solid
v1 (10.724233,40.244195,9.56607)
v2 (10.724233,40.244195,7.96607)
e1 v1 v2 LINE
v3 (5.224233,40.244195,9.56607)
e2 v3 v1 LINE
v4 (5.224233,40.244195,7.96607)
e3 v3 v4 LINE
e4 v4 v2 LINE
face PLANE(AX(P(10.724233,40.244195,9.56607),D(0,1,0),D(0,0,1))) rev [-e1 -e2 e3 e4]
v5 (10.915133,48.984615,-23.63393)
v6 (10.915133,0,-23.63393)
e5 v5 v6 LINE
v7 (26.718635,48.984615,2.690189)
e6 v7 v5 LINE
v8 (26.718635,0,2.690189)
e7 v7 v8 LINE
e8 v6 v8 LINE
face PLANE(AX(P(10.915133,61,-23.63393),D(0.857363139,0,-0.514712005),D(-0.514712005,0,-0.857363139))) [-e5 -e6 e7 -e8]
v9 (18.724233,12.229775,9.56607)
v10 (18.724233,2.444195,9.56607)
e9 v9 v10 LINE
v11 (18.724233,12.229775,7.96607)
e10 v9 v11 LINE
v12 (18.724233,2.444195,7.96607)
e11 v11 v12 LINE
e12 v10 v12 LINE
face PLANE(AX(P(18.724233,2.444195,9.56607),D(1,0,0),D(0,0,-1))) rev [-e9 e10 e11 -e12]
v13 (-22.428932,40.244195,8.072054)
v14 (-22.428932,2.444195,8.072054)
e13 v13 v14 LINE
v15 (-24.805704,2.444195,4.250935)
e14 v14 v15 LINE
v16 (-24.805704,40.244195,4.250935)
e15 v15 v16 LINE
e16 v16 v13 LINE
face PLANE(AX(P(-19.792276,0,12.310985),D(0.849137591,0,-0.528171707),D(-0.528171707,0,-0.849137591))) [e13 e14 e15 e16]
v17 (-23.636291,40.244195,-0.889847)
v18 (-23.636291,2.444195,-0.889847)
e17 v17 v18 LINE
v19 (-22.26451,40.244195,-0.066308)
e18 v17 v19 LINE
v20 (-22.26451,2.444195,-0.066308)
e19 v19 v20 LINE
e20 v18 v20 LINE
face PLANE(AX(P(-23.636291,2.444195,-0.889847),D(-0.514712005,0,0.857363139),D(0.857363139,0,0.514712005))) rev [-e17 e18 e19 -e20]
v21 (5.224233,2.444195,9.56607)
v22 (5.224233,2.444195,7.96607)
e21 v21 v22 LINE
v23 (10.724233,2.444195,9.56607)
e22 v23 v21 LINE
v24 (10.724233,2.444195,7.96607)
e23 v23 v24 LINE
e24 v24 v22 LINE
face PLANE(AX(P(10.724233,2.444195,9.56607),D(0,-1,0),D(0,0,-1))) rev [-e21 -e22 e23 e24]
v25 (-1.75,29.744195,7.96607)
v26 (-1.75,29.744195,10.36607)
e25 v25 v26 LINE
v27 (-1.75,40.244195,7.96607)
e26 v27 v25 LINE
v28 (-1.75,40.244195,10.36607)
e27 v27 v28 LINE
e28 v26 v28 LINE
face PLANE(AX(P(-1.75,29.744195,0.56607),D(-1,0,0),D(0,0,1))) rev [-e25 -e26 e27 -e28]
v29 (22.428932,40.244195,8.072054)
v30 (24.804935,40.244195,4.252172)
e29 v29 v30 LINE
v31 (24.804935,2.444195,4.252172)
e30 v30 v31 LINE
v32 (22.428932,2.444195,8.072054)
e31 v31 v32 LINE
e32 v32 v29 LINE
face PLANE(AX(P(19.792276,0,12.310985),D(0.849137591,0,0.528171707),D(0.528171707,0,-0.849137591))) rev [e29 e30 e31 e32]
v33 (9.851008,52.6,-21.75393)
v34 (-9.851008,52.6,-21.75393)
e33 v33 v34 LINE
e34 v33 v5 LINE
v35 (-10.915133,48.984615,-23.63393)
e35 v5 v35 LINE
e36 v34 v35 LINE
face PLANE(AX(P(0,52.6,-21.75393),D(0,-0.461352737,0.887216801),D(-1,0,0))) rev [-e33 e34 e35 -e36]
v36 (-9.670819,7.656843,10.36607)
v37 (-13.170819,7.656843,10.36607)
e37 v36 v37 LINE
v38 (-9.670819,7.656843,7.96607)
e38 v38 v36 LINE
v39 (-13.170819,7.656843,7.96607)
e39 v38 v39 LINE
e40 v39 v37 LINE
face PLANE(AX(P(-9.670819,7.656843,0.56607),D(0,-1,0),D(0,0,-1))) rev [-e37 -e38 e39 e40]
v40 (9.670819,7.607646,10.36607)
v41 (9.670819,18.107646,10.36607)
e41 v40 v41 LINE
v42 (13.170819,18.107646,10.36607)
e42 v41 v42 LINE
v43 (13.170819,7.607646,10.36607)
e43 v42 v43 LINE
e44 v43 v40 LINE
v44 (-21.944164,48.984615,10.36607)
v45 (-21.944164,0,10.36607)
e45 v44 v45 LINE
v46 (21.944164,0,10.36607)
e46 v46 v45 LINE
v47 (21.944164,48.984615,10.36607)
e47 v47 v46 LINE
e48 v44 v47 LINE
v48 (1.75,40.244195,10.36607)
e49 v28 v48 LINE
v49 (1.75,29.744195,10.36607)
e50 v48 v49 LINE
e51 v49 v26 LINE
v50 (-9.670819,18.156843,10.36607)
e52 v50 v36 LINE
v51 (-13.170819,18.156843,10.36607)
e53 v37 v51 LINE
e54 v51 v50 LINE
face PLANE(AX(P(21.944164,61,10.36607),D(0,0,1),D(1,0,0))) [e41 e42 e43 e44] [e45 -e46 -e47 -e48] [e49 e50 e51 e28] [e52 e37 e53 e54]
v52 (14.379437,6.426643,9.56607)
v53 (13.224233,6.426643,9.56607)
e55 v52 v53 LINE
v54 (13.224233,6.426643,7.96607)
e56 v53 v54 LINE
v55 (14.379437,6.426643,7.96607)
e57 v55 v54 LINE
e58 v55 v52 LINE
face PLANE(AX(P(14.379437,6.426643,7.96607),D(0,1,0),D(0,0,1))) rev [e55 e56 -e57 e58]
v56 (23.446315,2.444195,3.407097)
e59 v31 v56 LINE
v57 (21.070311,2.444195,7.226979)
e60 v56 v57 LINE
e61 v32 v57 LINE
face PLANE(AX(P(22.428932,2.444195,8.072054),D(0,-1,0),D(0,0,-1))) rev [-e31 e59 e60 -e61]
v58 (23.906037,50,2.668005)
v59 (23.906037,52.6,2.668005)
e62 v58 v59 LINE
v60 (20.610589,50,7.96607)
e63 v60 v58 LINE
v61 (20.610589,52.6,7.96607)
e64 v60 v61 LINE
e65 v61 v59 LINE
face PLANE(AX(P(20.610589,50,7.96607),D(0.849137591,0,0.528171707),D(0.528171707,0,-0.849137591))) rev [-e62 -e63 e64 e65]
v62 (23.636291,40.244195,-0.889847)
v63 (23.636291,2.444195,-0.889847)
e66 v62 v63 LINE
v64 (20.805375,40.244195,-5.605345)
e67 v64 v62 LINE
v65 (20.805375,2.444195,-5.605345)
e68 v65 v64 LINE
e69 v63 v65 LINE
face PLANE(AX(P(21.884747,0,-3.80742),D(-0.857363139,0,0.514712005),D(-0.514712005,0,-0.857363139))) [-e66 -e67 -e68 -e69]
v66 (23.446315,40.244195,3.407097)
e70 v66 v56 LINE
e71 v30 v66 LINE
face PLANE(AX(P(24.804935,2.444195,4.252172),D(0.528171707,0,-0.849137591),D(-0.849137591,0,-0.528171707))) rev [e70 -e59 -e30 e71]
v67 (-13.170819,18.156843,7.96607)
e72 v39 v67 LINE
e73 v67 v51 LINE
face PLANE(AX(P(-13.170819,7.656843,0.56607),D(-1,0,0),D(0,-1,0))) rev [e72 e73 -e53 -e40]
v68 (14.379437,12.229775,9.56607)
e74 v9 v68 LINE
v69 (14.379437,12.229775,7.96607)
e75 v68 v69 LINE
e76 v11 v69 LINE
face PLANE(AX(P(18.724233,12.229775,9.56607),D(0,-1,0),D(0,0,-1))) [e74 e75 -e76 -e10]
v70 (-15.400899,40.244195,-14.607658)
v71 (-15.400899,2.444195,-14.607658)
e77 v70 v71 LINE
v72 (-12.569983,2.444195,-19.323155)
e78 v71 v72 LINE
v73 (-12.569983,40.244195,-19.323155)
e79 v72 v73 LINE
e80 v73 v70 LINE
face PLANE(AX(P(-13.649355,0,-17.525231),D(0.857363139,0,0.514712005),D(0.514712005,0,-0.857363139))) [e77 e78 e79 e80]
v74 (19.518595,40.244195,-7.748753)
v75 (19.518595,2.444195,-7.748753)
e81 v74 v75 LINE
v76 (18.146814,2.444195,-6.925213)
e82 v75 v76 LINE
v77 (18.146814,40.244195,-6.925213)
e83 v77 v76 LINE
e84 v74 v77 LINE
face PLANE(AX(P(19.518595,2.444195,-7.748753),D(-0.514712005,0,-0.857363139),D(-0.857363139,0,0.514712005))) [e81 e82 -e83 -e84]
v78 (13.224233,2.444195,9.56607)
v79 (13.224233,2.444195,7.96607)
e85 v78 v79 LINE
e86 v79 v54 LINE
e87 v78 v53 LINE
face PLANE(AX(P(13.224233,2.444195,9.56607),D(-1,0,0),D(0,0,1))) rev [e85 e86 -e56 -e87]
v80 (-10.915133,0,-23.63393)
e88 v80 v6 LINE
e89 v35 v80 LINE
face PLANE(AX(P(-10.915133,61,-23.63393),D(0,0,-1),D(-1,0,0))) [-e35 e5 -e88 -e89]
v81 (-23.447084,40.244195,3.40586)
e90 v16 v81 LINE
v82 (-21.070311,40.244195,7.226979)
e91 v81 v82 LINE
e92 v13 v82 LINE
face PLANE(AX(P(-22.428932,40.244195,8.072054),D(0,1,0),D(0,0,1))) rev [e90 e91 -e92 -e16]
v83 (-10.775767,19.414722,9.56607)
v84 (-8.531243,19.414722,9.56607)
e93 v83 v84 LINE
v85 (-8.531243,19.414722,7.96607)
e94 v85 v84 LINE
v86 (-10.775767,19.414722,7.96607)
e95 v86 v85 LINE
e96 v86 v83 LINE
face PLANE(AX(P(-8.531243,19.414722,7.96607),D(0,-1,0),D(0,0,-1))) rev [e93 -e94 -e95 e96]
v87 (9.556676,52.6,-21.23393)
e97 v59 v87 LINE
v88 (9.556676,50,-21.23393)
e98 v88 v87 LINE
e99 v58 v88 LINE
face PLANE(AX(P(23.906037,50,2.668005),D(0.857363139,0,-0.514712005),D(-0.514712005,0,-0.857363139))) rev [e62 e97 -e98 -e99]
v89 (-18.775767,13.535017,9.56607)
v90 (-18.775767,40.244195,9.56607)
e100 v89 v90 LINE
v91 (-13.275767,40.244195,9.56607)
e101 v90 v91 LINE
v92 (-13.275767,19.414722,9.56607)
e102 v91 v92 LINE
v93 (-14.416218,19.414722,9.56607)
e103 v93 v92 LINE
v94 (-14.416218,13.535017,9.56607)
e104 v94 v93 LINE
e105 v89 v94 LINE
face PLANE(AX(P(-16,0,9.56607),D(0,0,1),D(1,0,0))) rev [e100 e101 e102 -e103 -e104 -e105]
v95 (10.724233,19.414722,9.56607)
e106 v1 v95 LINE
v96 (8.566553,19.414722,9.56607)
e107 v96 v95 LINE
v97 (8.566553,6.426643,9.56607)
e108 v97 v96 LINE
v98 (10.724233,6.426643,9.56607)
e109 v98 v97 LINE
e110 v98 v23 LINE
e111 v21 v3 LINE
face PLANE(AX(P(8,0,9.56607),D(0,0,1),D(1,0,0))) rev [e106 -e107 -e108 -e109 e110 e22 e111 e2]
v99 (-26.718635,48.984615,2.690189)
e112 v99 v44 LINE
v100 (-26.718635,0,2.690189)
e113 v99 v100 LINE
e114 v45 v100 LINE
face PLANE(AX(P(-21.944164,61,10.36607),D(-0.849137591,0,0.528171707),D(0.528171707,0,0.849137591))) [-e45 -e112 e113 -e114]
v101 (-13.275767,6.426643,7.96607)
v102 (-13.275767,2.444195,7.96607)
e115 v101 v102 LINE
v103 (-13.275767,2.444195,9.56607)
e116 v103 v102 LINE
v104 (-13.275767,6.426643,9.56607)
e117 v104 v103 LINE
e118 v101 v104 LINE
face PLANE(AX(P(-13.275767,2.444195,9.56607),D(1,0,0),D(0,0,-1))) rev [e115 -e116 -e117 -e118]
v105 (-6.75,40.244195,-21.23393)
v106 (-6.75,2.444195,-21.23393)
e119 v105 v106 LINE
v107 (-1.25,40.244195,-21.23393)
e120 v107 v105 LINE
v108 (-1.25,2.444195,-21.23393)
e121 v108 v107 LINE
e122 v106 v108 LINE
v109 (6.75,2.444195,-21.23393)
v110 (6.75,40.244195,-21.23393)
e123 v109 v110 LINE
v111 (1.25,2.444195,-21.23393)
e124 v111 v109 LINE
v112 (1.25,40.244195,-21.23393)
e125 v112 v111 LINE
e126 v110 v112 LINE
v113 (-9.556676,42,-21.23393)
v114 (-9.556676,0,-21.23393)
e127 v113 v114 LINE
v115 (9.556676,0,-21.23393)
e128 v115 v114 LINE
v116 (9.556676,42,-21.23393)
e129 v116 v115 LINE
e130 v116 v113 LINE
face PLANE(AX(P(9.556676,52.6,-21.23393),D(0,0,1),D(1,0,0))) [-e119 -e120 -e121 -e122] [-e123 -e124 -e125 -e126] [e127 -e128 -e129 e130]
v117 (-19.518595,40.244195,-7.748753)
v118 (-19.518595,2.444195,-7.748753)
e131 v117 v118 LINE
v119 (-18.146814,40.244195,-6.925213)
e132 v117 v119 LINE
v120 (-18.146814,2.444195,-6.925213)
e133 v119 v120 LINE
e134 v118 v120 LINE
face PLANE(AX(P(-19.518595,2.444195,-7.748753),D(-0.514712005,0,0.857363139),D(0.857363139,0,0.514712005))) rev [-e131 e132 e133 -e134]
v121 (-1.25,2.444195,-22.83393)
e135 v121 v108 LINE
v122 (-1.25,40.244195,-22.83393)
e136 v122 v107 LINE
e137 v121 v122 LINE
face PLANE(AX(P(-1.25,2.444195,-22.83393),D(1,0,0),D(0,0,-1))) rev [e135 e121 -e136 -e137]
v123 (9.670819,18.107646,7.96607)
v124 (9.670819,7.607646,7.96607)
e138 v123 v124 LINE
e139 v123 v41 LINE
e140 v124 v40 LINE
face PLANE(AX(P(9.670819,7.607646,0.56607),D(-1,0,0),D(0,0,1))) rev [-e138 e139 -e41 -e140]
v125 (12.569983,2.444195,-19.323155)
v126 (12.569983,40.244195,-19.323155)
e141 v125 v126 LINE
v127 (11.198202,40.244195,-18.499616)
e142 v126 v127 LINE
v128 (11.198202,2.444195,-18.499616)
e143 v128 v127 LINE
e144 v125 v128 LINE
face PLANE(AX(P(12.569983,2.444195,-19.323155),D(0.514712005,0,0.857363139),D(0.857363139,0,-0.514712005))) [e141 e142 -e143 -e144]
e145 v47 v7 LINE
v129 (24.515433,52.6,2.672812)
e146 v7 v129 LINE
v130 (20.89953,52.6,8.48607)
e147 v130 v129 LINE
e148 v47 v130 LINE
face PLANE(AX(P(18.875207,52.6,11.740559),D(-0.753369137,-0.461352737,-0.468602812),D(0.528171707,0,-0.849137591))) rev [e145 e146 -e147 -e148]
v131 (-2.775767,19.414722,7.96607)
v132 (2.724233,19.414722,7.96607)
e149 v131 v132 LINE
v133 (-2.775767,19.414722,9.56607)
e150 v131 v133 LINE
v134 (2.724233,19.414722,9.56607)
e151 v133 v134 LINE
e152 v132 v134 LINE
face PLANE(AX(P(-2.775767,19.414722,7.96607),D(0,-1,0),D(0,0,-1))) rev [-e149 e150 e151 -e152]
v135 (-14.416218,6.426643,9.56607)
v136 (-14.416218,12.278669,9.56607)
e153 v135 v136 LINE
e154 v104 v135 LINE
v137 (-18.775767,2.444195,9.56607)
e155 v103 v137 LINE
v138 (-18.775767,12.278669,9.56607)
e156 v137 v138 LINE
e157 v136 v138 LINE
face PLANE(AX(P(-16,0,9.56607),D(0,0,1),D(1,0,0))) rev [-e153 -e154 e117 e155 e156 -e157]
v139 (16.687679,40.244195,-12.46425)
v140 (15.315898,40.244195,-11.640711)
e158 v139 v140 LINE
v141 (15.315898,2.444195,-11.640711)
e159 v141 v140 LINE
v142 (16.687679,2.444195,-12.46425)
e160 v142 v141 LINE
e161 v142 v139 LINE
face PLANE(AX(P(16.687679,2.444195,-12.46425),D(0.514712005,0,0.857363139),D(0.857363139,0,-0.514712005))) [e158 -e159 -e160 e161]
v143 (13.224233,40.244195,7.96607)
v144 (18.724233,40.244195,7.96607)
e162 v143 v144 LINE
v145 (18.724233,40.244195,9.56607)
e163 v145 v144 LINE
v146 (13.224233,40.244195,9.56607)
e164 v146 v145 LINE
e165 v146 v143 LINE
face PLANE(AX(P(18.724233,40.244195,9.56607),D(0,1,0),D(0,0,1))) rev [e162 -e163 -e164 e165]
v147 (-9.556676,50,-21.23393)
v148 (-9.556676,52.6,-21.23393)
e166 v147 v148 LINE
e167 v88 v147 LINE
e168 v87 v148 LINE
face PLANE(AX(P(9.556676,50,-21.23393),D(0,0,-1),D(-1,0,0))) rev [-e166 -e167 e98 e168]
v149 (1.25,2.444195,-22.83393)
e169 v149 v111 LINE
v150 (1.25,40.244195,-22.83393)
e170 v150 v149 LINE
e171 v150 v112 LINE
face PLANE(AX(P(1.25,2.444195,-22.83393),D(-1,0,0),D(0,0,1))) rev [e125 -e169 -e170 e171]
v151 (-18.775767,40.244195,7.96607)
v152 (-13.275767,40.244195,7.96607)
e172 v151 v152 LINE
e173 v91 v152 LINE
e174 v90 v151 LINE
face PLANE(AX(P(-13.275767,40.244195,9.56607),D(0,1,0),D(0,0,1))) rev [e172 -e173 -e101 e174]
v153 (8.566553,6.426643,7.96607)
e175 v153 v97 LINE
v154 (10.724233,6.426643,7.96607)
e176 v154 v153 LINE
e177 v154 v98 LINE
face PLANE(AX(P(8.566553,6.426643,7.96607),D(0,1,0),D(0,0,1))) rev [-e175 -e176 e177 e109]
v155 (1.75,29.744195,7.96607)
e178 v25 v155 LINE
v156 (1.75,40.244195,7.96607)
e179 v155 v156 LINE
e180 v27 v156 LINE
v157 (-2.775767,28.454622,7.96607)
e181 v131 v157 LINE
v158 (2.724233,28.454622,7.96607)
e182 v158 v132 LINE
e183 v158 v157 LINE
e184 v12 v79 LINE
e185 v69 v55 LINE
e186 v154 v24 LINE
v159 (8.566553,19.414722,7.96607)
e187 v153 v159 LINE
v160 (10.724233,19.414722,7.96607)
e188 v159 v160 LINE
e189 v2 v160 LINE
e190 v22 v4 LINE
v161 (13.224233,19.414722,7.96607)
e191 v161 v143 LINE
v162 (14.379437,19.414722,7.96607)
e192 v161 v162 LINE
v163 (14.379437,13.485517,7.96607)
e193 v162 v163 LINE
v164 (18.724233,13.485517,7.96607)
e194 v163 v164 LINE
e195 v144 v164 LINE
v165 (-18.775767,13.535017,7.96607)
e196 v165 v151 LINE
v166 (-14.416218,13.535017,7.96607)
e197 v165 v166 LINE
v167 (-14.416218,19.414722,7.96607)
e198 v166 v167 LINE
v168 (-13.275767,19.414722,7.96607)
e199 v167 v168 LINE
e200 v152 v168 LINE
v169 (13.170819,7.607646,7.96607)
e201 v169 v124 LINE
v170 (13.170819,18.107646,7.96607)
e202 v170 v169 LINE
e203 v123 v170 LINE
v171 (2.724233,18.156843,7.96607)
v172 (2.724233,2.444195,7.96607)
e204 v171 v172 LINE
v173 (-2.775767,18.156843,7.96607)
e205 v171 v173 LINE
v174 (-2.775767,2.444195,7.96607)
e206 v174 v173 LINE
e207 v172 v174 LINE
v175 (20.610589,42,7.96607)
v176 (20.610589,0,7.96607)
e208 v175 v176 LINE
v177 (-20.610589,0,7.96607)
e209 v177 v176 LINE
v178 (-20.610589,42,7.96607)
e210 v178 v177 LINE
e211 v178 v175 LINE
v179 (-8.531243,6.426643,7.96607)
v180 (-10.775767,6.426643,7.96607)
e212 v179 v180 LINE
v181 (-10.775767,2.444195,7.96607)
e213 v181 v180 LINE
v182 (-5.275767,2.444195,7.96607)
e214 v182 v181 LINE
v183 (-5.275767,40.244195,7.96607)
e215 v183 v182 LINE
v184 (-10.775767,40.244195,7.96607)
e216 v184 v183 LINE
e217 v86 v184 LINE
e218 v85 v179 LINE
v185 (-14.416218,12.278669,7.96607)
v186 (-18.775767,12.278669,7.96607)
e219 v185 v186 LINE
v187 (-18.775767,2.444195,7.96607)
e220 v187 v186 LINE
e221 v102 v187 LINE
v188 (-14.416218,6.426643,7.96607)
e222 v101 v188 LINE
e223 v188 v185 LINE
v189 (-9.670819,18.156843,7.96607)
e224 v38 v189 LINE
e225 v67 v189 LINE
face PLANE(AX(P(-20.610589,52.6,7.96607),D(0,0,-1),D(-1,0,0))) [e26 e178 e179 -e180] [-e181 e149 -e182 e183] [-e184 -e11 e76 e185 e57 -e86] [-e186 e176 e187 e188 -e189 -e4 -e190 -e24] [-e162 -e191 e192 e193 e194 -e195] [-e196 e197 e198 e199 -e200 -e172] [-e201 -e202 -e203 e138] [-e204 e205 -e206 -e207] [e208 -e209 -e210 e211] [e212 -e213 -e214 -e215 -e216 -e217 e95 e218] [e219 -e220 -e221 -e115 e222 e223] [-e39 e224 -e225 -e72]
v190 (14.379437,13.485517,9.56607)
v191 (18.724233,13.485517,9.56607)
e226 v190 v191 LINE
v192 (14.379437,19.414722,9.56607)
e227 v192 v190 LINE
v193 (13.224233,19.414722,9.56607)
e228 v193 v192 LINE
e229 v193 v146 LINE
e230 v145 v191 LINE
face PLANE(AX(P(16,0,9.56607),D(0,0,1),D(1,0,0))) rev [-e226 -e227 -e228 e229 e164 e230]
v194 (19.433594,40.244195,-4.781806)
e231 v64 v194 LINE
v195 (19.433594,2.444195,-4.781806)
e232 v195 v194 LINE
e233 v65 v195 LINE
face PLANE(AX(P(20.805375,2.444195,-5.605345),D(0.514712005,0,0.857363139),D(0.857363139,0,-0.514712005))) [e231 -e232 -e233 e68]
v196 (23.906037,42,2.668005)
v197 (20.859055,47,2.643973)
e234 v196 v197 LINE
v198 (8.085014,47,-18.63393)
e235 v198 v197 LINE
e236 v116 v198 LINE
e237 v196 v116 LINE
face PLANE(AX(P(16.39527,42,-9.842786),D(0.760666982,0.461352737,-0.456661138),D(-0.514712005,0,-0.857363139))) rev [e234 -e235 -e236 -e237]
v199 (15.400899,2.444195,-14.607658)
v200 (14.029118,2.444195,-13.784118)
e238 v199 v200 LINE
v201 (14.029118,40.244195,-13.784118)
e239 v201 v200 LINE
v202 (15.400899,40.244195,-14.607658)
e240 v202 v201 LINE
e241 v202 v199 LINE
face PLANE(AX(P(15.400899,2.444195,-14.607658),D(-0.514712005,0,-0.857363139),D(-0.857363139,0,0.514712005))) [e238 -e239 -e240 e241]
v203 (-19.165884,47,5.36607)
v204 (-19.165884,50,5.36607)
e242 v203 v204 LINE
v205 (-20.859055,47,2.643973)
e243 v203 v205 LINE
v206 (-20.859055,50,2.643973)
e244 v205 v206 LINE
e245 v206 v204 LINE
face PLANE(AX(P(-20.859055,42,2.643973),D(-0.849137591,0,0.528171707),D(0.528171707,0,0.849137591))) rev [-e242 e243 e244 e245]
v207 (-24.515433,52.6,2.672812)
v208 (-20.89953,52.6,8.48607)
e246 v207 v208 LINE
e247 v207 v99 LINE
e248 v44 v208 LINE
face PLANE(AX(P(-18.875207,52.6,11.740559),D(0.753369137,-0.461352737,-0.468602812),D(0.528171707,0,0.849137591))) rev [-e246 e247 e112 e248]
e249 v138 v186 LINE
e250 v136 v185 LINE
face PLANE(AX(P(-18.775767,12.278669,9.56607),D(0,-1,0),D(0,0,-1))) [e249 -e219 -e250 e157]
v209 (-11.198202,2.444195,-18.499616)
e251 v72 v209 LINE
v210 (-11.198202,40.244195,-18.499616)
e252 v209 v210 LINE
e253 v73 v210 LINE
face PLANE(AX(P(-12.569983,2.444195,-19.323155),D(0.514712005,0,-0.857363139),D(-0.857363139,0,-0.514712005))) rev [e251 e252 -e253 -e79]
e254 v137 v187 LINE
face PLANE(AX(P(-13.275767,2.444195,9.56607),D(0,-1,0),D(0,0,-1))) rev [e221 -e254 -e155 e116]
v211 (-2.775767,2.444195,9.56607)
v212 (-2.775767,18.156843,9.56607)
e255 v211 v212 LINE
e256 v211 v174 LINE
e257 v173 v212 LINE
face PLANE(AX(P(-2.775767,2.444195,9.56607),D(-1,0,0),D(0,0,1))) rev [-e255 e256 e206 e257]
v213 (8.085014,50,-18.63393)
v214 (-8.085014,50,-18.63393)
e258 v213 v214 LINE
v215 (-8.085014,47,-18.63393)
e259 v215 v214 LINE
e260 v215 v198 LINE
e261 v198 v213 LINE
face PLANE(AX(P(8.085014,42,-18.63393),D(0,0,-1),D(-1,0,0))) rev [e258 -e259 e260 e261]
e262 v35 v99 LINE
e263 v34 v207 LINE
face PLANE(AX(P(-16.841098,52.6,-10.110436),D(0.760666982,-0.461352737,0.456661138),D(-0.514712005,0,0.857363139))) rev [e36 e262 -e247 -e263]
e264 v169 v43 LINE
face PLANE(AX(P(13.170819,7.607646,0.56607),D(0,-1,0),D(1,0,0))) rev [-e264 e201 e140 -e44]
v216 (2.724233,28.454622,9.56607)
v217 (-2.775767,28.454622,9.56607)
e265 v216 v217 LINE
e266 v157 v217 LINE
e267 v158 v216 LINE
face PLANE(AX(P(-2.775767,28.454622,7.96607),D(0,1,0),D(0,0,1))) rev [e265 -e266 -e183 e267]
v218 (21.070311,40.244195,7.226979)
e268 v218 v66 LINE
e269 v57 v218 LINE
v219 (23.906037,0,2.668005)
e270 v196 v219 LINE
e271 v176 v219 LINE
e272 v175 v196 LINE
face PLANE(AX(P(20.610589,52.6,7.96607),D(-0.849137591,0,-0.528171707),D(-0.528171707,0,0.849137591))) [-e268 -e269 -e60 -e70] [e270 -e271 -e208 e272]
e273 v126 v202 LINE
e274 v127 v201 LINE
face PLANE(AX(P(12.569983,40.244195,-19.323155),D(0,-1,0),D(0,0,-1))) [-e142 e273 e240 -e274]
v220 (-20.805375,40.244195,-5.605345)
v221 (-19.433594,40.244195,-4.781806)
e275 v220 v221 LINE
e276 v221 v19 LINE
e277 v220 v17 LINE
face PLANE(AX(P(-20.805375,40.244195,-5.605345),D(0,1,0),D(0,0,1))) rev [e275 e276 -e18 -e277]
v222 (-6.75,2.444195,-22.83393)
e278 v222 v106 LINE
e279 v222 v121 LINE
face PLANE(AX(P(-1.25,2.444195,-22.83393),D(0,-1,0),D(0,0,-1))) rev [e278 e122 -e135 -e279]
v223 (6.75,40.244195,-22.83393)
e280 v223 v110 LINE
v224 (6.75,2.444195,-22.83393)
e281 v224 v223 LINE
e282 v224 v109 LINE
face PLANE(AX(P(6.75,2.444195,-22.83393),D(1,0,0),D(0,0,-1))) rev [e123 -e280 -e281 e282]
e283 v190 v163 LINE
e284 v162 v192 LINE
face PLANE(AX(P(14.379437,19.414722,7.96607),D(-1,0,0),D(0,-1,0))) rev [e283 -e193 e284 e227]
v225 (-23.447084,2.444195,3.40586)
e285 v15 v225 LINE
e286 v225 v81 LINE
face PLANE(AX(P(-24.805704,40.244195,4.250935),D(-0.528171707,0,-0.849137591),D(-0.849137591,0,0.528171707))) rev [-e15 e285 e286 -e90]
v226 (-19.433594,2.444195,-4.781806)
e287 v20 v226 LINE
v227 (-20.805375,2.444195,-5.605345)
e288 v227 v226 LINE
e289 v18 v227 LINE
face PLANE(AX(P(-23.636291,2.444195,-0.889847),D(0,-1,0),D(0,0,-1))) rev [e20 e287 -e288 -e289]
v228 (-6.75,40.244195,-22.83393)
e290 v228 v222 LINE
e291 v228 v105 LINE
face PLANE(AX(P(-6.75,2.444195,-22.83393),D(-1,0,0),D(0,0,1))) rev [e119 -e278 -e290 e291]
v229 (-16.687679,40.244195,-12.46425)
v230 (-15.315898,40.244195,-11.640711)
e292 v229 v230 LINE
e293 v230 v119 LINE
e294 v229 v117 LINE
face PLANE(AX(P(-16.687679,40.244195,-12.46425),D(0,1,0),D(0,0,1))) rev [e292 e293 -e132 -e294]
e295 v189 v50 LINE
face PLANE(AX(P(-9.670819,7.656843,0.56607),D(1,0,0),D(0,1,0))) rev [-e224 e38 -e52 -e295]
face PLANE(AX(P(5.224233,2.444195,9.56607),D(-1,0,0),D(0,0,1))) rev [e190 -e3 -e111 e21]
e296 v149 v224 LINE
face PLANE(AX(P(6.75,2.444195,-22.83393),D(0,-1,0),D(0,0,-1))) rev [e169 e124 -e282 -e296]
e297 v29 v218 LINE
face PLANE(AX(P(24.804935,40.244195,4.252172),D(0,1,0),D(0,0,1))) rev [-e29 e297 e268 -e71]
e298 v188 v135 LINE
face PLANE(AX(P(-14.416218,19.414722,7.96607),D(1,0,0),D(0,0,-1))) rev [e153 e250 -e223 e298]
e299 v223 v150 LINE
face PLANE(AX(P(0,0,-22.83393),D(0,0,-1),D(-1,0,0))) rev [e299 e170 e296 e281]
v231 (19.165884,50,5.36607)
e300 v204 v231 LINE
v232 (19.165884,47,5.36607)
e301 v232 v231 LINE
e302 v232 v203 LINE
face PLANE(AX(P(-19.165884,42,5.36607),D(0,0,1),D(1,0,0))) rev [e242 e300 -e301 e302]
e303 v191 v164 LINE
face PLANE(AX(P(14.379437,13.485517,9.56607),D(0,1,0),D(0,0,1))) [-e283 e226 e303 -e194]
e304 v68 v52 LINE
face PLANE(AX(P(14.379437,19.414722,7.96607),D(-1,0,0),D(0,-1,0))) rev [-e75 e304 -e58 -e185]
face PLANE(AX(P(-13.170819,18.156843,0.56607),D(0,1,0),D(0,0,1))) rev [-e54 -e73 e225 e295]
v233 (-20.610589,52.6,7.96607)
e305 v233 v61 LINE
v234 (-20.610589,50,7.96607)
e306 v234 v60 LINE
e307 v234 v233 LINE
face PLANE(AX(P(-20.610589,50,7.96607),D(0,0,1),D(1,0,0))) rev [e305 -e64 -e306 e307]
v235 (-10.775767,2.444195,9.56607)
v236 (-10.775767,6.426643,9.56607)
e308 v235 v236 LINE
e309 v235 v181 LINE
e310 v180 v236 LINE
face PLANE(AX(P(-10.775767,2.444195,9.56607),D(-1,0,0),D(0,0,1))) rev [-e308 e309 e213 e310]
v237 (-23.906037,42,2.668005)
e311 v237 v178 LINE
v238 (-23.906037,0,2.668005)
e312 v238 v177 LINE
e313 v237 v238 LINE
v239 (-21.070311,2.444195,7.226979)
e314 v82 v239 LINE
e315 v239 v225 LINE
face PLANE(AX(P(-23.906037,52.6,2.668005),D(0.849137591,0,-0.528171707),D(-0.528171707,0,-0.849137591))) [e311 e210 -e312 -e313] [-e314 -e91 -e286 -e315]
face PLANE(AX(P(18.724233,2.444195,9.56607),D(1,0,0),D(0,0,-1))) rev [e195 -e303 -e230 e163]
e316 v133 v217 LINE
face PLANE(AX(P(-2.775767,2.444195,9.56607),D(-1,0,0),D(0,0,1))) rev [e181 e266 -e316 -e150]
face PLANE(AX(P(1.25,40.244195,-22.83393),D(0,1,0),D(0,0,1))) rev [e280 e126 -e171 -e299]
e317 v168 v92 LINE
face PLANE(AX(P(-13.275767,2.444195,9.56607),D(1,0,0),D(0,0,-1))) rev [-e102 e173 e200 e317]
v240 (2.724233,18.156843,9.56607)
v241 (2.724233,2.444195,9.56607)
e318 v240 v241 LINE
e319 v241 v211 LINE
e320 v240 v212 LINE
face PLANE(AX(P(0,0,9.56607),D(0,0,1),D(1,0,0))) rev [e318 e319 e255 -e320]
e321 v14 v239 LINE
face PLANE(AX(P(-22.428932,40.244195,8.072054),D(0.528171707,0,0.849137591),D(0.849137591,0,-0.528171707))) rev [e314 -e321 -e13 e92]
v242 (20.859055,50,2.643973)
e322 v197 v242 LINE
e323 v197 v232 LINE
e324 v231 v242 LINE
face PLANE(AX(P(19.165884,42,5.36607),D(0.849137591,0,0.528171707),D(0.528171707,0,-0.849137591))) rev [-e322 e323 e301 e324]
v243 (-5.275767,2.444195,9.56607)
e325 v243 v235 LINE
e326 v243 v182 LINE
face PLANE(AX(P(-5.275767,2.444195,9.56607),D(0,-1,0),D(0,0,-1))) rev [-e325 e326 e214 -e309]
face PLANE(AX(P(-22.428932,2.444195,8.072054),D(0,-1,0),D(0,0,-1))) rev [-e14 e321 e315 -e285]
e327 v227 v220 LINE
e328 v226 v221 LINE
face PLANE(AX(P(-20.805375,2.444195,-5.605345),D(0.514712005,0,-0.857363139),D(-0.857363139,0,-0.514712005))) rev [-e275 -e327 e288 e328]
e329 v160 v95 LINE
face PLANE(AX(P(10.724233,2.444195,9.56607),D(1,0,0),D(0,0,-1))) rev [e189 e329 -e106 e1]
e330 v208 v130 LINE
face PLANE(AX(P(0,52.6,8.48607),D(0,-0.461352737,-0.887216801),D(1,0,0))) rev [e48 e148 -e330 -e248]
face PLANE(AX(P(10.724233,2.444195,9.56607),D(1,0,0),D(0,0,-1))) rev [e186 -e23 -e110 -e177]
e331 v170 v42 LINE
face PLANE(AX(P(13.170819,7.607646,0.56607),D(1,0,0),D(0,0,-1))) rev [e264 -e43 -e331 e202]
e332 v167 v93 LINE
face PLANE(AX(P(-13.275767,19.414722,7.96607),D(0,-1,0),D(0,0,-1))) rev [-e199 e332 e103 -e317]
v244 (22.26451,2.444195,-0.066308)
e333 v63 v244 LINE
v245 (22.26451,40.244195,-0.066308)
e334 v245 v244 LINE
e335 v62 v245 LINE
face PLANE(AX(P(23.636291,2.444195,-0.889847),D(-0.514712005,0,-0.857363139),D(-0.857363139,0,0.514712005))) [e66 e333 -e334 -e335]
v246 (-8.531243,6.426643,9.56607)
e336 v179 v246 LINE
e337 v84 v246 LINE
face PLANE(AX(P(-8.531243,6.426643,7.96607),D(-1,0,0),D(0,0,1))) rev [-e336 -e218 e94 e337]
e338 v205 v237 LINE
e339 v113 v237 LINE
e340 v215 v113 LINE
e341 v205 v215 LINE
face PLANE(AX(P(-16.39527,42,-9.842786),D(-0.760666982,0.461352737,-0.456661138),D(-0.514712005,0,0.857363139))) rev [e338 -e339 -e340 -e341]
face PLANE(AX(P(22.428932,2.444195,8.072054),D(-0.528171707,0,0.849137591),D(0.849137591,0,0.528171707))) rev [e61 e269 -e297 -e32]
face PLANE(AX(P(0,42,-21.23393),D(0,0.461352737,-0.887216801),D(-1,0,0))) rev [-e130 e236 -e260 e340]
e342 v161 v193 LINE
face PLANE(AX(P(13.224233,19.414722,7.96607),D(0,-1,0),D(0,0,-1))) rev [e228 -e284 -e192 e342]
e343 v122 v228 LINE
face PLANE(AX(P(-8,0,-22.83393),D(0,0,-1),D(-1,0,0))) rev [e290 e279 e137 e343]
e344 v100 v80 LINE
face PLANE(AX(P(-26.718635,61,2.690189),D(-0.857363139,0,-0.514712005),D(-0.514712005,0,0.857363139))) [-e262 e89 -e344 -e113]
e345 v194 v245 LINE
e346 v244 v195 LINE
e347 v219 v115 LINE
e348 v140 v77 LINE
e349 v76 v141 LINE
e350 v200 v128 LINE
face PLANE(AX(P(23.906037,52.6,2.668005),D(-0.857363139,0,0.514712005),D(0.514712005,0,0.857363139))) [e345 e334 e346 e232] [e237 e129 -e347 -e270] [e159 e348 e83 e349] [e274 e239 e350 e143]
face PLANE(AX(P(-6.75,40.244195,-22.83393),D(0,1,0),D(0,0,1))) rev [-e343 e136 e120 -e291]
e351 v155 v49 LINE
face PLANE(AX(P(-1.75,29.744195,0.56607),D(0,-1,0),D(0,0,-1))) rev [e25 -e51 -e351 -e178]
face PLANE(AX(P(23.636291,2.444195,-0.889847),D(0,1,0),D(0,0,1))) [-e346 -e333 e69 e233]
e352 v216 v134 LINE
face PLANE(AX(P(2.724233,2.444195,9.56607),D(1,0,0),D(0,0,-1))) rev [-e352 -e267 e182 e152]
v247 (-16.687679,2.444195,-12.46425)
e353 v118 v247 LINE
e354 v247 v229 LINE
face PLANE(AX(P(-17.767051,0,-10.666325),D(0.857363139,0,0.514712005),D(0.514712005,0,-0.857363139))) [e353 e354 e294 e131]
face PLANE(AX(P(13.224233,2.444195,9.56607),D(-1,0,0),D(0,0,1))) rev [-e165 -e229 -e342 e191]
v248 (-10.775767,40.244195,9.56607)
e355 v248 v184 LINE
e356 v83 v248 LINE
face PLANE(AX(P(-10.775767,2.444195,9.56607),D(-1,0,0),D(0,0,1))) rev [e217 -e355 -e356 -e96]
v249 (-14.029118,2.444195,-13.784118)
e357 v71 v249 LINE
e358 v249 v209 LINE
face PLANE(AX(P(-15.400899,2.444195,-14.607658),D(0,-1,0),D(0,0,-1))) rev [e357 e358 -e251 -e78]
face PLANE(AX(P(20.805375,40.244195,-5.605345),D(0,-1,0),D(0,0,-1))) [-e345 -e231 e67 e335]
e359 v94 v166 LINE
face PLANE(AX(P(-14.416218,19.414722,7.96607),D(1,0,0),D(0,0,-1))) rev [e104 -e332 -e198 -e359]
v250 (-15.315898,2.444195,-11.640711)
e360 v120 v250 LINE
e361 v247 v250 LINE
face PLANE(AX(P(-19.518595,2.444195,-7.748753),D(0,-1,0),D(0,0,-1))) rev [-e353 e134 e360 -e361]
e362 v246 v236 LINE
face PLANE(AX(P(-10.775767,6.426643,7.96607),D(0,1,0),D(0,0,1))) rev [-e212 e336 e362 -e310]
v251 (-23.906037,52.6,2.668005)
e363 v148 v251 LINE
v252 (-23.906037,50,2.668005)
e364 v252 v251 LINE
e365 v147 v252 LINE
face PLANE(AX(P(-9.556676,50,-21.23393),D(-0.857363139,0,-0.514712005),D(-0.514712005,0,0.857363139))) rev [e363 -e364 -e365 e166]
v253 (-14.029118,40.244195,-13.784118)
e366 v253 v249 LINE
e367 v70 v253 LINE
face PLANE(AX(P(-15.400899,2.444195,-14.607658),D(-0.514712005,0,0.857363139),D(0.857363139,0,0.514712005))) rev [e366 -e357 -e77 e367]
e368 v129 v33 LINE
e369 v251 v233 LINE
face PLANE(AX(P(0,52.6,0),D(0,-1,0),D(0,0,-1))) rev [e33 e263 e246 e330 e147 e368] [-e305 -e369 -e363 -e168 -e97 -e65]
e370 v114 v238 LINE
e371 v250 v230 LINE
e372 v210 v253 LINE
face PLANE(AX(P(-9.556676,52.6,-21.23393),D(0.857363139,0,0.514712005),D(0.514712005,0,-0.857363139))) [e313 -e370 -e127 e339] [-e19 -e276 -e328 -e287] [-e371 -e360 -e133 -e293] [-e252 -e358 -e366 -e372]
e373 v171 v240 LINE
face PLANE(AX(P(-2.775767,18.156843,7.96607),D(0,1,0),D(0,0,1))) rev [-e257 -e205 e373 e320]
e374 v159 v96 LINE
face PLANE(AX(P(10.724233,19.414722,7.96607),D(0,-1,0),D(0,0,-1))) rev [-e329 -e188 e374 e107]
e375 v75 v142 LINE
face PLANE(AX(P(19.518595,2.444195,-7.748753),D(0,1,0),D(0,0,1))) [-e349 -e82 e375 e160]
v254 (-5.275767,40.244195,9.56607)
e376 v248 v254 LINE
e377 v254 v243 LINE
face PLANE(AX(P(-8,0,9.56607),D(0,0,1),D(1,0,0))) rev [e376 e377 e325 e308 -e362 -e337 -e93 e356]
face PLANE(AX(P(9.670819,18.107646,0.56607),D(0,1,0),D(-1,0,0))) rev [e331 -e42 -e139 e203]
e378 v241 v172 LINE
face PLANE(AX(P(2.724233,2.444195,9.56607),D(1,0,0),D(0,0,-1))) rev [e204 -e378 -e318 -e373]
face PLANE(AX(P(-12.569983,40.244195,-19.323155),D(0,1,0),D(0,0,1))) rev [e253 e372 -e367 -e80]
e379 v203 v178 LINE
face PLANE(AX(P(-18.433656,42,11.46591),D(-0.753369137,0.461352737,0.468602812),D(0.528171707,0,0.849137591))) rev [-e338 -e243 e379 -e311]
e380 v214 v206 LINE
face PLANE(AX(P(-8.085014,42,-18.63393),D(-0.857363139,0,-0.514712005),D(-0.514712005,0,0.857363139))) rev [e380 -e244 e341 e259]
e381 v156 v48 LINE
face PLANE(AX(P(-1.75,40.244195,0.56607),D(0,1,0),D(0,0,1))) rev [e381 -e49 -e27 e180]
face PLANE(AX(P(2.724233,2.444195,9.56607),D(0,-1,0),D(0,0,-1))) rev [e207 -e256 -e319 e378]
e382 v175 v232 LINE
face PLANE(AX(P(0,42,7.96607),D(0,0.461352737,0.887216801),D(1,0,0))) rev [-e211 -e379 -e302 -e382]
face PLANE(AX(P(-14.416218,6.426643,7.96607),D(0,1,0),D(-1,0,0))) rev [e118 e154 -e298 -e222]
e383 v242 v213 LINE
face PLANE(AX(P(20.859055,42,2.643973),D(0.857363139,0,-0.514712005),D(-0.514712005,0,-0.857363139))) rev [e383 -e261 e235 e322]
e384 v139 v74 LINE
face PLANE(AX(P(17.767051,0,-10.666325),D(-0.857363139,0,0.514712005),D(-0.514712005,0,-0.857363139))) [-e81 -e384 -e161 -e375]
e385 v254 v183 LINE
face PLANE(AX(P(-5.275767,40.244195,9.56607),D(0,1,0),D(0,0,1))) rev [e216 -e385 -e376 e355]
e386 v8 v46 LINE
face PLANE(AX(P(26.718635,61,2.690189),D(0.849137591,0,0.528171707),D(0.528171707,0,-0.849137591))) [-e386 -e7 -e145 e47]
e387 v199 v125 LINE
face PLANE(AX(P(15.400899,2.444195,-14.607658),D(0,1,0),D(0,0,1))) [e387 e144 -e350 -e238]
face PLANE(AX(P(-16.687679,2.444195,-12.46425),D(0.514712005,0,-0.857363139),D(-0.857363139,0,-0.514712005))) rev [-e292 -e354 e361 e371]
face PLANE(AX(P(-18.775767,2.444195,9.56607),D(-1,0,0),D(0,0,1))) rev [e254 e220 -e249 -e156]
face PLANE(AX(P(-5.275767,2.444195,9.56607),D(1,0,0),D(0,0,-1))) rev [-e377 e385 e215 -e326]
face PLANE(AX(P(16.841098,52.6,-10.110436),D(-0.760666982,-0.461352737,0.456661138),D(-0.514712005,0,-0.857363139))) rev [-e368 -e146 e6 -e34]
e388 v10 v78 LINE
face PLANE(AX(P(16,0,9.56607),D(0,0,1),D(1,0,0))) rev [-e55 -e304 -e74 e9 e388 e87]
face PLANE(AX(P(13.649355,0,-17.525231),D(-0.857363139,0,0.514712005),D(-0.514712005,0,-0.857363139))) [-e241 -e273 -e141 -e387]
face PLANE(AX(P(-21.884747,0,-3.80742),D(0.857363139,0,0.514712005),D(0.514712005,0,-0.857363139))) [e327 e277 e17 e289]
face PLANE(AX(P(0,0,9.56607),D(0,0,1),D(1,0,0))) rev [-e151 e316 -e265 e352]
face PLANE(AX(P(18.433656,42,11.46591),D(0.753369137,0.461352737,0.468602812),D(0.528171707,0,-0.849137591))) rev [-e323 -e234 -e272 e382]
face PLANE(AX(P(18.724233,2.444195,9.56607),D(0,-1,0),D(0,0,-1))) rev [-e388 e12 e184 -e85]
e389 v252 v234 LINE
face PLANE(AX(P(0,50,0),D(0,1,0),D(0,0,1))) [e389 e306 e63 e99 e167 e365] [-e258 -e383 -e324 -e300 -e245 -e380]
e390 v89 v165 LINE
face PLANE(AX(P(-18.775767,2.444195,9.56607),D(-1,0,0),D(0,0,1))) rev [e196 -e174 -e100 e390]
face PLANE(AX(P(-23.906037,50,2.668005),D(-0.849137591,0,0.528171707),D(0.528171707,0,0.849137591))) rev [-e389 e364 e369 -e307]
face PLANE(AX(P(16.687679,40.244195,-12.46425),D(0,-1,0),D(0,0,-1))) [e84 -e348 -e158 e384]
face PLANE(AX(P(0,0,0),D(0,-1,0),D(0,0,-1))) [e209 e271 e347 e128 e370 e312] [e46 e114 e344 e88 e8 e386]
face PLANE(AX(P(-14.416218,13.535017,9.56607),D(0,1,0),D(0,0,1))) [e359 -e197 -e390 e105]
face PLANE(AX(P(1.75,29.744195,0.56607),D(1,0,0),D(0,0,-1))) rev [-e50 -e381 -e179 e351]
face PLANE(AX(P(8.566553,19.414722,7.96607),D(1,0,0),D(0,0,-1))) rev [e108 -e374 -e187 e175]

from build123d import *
from OCP.BRepFilletAPI import BRepFilletAPI_MakeChamfer

# Parameters (mm, degrees)
BOSS_EXTRUDE1_DEPTH     = 52.6
BOSS_EXTRUDE2_DEPTH     = 10.6
CUT_EXTRUDE1_DEPTH      = 2.6
CHAMFER1_SIZE           = 4
CHAMFER1_SIZE2          = 2.08
CHAMFER2_SIZE           = 2.6
CHAMFER2_SIZE_2         = 5
SKETCH4_W               = 3.5
SKETCH4_H               = 10.5
CUT_EXTRUDE2_DEPTH      = 10
CUT_EXTRUDE3_DEPTH      = 61
SKETCH7_W               = 5.5
SKETCH7_H               = 37.8
CUT_EXTRUDE4_DEPTH      = 1.6
LPATTERN1_COUNT         = 3
LPATTERN1_PITCH         = 8
LPATTERN1_COL_COUNT     = 3
LPATTERN1_COL_PITCH     = 8
BOSS_EXTRUDE4_DEPTH     = 1.6
SKETCH9_W               = 1.140450815
SKETCH9_H               = 12.988078935
BOSS_EXTRUDE5_DEPTH     = 1.6
BOSS_EXTRUDE6_DEPTH     = 1.6
SKETCH12_W              = 5.5
SKETCH12_H              = 1.257878545
BOSS_EXTRUDE7_DEPTH     = 1.6
SKETCH13_W              = 4.498542915
SKETCH13_H              = 37.8
CUT_EXTRUDE5_DEPTH      = 1.6
SKETCH14_W              = 4.344795522
SKETCH14_H              = 1.255742166
SKETCH14_W_2            = 4.359549185
SKETCH14_H_2            = 1.256348334
BOSS_EXTRUDE8_DEPTH     = 1.6
SKETCH15_W              = 4.5
SKETCH15_H              = 37.8
CUT_EXTRUDE6_DEPTH      = 1.6
SKETCH16_W              = 5.5
SKETCH16_H              = 37.8
CUT_EXTRUDE7_DEPTH      = 1.6
LPATTERN2_COUNT         = 2
LPATTERN2_PITCH         = 8
LPATTERN2_COL_COUNT     = 2
LPATTERN2_COL_PITCH     = 8
MIRROR2_COPY_1_SKETCH_W = 5.5
MIRROR2_COPY_1_SKETCH_H = 37.8
MIRROR2_COPY_1_DEPTH    = 1.6
MIRROR2_COPY_2_SKETCH_W = 5.5
MIRROR2_COPY_2_SKETCH_H = 37.8
MIRROR2_COPY_2_DEPTH    = 1.6
SKETCH17_W              = 5.5
SKETCH17_H              = 37.8
CUT_EXTRUDE8_DEPTH      = 1.6
LPATTERN3_COUNT         = 2
LPATTERN3_PITCH         = 8


with BuildPart() as part:
    # Sketch1 → Boss-Extrude1 (new body)
    with BuildSketch(Plane(origin=(0, 0, 0), x_dir=(1, 0, 0), z_dir=(0, 1, 0))):
        Polygon((-26.953018279, -2.69203799), (-22.055294719, -10.566070483), (22.055294719, -10.566070483), (26.953018279, -2.69203799), (11.028337958, 23.833929517), (-11.028337958, 23.833929517), align=None)
        Polygon((-23.906036559, -2.668005496), (-20.610589438, -7.966070483), (20.610589438, -7.966070483), (23.906036559, -2.668005496), (9.556675916, 21.233929517), (-9.556675916, 21.233929517), align=None, mode=Mode.SUBTRACT)
    extrude(amount=BOSS_EXTRUDE1_DEPTH)

    # Sketch2 → Boss-Extrude2 (add)
    with BuildSketch(Plane(origin=(0, 52.6, 0), x_dir=(1, 0, 0), z_dir=(0, 1, 0))):
        Polygon((-23.906036559, -2.668005496), (-20.610589438, -7.966070483), (20.610589438, -7.966070483), (23.906036559, -2.668005496), (9.556675916, 21.233929517), (-9.556675916, 21.233929517), align=None)
        Polygon((-20.859054838, -2.643973003), (-19.165884157, -5.366070483), (19.165884157, -5.366070483), (20.859054838, -2.643973003), (8.085013874, 18.633929517), (-8.085013874, 18.633929517), align=None, mode=Mode.SUBTRACT)
    extrude(amount=-BOSS_EXTRUDE2_DEPTH)

    # Sketch3 → Cut-Extrude1 (cut)
    with BuildSketch(Plane(origin=(0, 52.6, 0), x_dir=(1, 0, 0), z_dir=(0, 1, 0))):
        Polygon((-23.906036559, -2.668005496), (-20.610589438, -7.966070483), (20.610589438, -7.966070483), (23.906036559, -2.668005496), (9.556675916, 21.233929517), (-9.556675916, 21.233929517), align=None)
        Polygon((-20.859054838, -2.643973003), (-19.165884157, -5.366070483), (19.165884157, -5.366070483), (20.859054838, -2.643973003), (8.085013874, 18.633929517), (-8.085013874, 18.633929517), align=None, mode=Mode.SUBTRACT)
    extrude(amount=-CUT_EXTRUDE1_DEPTH, mode=Mode.SUBTRACT)

    # Chamfer1: one chamfer whose edges measure the first distance from different faces: ONE call of the kernel's chamfer builder (chamfer() names one face for all edges)
    chamfer1_edges_1 = [part.edges().sort_by_distance(p)[0] for p in [
        (-18.990678119, 52.6, -10.570945764),
    ]]
    chamfer1_side_1 = [part.faces().sort_by_distance(p)[0] for p in [
        (-18.990678119, 26.3, -10.570945764),
    ]]
    chamfer1_edges_2 = [part.edges().sort_by_distance(p)[0] for p in [
        (-24.504156499, 52.6, 6.629054236),
    ]]
    chamfer1_side_2 = [part.faces().sort_by_distance(p)[0] for p in [
        (-24.504156499, 26.3, 6.629054236),
    ]]
    chamfer1_edges_3 = [part.edges().sort_by_distance(p)[0] for p in [
        (0, 52.6, 10.566070483),
    ]]
    chamfer1_side_3 = [part.faces().sort_by_distance(p)[0] for p in [
        (0, 26.3, 10.566070483),
    ]]
    chamfer1_edges_4 = [part.edges().sort_by_distance(p)[0] for p in [
        (24.504156499, 52.6, 6.629054236),
    ]]
    chamfer1_side_4 = [part.faces().sort_by_distance(p)[0] for p in [
        (24.504156499, 26.3, 6.629054236),
    ]]
    chamfer1_edges_5 = [part.edges().sort_by_distance(p)[0] for p in [
        (18.990678119, 52.6, -10.570945764),
    ]]
    chamfer1_side_5 = [part.faces().sort_by_distance(p)[0] for p in [
        (18.990678119, 26.3, -10.570945764),
    ]]
    chamfer1_edges_6 = [part.edges().sort_by_distance(p)[0] for p in [
        (0, 52.6, -23.833929517),
    ]]
    chamfer1_side_6 = [part.faces().sort_by_distance(p)[0] for p in [
        (0, 26.3, -23.833929517),
    ]]
    chamfer1 = BRepFilletAPI_MakeChamfer(part.part.solid().wrapped)
    for e in chamfer1_edges_1:
        chamfer1.Add(CHAMFER1_SIZE, CHAMFER1_SIZE2, e.wrapped, chamfer1_side_1[0].wrapped)  # the first distance lies on this face
    for e in chamfer1_edges_2:
        chamfer1.Add(CHAMFER1_SIZE, CHAMFER1_SIZE2, e.wrapped, chamfer1_side_2[0].wrapped)  # the first distance lies on this face
    for e in chamfer1_edges_3:
        chamfer1.Add(CHAMFER1_SIZE, CHAMFER1_SIZE2, e.wrapped, chamfer1_side_3[0].wrapped)  # the first distance lies on this face
    for e in chamfer1_edges_4:
        chamfer1.Add(CHAMFER1_SIZE, CHAMFER1_SIZE2, e.wrapped, chamfer1_side_4[0].wrapped)  # the first distance lies on this face
    for e in chamfer1_edges_5:
        chamfer1.Add(CHAMFER1_SIZE, CHAMFER1_SIZE2, e.wrapped, chamfer1_side_5[0].wrapped)  # the first distance lies on this face
    for e in chamfer1_edges_6:
        chamfer1.Add(CHAMFER1_SIZE, CHAMFER1_SIZE2, e.wrapped, chamfer1_side_6[0].wrapped)  # the first distance lies on this face
    add(Compound.cast(chamfer1.Shape()), mode=Mode.REPLACE)

    # Chamfer2
    chamfer2_edges_1 = [part.edges().sort_by_distance(p)[0] for p in [
        (0, 42, -18.633929517),
    ]]
    chamfer2_side_1 = [part.faces().sort_by_distance(p)[0] for p in [
        (0, 42, -18.685929517),
    ]]
    chamfer2_edges_2 = [part.edges().sort_by_distance(p)[0] for p in [
        (-14.472034356, 42, -7.994978257),
    ]]
    chamfer2_side_2 = [part.faces().sort_by_distance(p)[0] for p in [
        (-14.516617239, 42, -8.021743281),
    ]]
    chamfer2_edges_3 = [part.edges().sort_by_distance(p)[0] for p in [
        (-20.012469497, 42, 4.005021743),
    ]]
    chamfer2_side_3 = [part.faces().sort_by_distance(p)[0] for p in [
        (-20.056624652, 42, 4.032486672),
    ]]
    chamfer2_edges_4 = [part.edges().sort_by_distance(p)[0] for p in [
        (0, 42, 5.366070483),
    ]]
    chamfer2_side_4 = [part.faces().sort_by_distance(p)[0] for p in [
        (0, 42, 5.418070483),
    ]]
    chamfer2_edges_5 = [part.edges().sort_by_distance(p)[0] for p in [
        (20.012469497, 42, 4.005021743),
    ]]
    chamfer2_side_5 = [part.faces().sort_by_distance(p)[0] for p in [
        (20.056624652, 42, 4.032486672),
    ]]
    chamfer2_edges_6 = [part.edges().sort_by_distance(p)[0] for p in [
        (14.472034356, 42, -7.994978257),
    ]]
    chamfer2_side_6 = [part.faces().sort_by_distance(p)[0] for p in [
        (14.516617239, 42, -8.021743281),
    ]]
    chamfer2 = BRepFilletAPI_MakeChamfer(part.part.solid().wrapped)
    for e in chamfer2_edges_1:
        chamfer2.Add(CHAMFER2_SIZE - 0.0001, CHAMFER2_SIZE_2 - 0.0001, e.wrapped, chamfer2_side_1[0].wrapped)
    for e in chamfer2_edges_2:
        chamfer2.Add(CHAMFER2_SIZE - 0.0001, CHAMFER2_SIZE_2 - 0.0001, e.wrapped, chamfer2_side_2[0].wrapped)
    for e in chamfer2_edges_3:
        chamfer2.Add(CHAMFER2_SIZE - 0.0001, CHAMFER2_SIZE_2 - 0.0001, e.wrapped, chamfer2_side_3[0].wrapped)
    for e in chamfer2_edges_4:
        chamfer2.Add(CHAMFER2_SIZE - 0.0001, CHAMFER2_SIZE_2 - 0.0001, e.wrapped, chamfer2_side_4[0].wrapped)
    for e in chamfer2_edges_5:
        chamfer2.Add(CHAMFER2_SIZE - 0.0001, CHAMFER2_SIZE_2 - 0.0001, e.wrapped, chamfer2_side_5[0].wrapped)
    for e in chamfer2_edges_6:
        chamfer2.Add(CHAMFER2_SIZE - 0.0001, CHAMFER2_SIZE_2 - 0.0001, e.wrapped, chamfer2_side_6[0].wrapped)
    add(Compound.cast(chamfer2.Shape()), mode=Mode.REPLACE)  # a hair under: the kernel refuses the full size

    # Sketch4 → Cut-Extrude2 (cut)
    with BuildSketch(Plane.XY.offset(10.566070483)):
        with Locations((0, 34.994195005)):
            Rectangle(SKETCH4_W, SKETCH4_H)
        with Locations((-11.42081888, 12.906843201)):
            Rectangle(SKETCH4_W, SKETCH4_H)
        with Locations((11.42081888, 12.857646379)):
            Rectangle(SKETCH4_W, SKETCH4_H)
    extrude(amount=-CUT_EXTRUDE2_DEPTH, mode=Mode.SUBTRACT)

    # Sketch6 → Cut-Extrude3 (cut)
    with BuildSketch(Plane.XZ):
        Polygon((11.028337958, -23.833929517), (26.953018279, 2.69203799), (22.055294719, 10.566070483), (-22.055294719, 10.566070483), (-26.953018279, 2.69203799), (-11.028337958, -23.833929517), align=None)
        Polygon((10.915133186, -23.633929517), (26.71863507, 2.690189336), (21.944163543, 10.366070483), (-21.944163543, 10.366070483), (-26.71863507, 2.690189336), (-10.915133186, -23.633929517), align=None, mode=Mode.SUBTRACT)
    extrude(amount=-CUT_EXTRUDE3_DEPTH, mode=Mode.SUBTRACT)

    # Sketch7 → Cut-Extrude4 (cut)
    with BuildSketch(Plane(origin=(0, 0, 7.966070483), x_dir=(-1, 0, 0), z_dir=(0, 0, -1))):
        with Locations((0.025767353, 21.344195005)):
            Rectangle(SKETCH7_W, SKETCH7_H)
    cut_extrude4 = extrude(amount=-CUT_EXTRUDE4_DEPTH, mode=Mode.SUBTRACT)

    # LPattern1: Cut-Extrude4 ×3
    with Locations(*[(-i * LPATTERN1_PITCH, 0, 0) for i in range(1, LPATTERN1_COUNT)]):
        add(cut_extrude4, mode=Mode.SUBTRACT)

    # LPattern1 col: Cut-Extrude4 ×3
    with Locations(*[(i * LPATTERN1_COL_PITCH, 0, 0) for i in range(1, LPATTERN1_COL_COUNT)]):
        add(cut_extrude4, mode=Mode.SUBTRACT)

    # Sketch8 → Boss-Extrude4 (add)
    with BuildSketch(Plane(origin=(0, 0, 9.566070483), x_dir=(-1, 0, 0), z_dir=(0, 0, -1))):
        Polygon((2.775767353, 40.244195005), (2.775767353, 28.454622031), (-2.724232647, 28.454622031), (-2.724232647, 40.244195005), (-1.75, 40.244195005), (-1.75, 29.744195005), (1.75, 29.744195005), (1.75, 40.244195005), align=None)
    extrude(amount=BOSS_EXTRUDE4_DEPTH)

    # Sketch9 → Boss-Extrude5 (add)
    with BuildSketch(Plane(origin=(0, 0, 9.566070483), x_dir=(-1, 0, 0), z_dir=(0, 0, -1))):
        Polygon((10.775767353, 18.156843201), (9.67081888, 18.156843201), (9.67081888, 7.656843201), (10.775767353, 7.656843201), (10.775767353, 6.426642811), (8.531242664, 6.426642811), (8.531242664, 19.414721746), (10.775767353, 19.414721746), align=None)
        with Locations((13.84599276, 12.920682279)):
            Rectangle(SKETCH9_W, SKETCH9_H)
    extrude(amount=BOSS_EXTRUDE5_DEPTH)

    # Sketch11 → Boss-Extrude6 (add)
    with BuildSketch(Plane(origin=(0, 0, 9.566070483), x_dir=(-1, 0, 0), z_dir=(0, 0, -1))):
        Polygon((-10.724232647, 18.107646379), (-9.67081888, 18.107646379), (-9.67081888, 7.607646379), (-10.724232647, 7.607646379), (-10.724232647, 6.426642811), (-8.566553257, 6.426642811), (-8.566553257, 19.414721746), (-10.724232647, 19.414721746), align=None)
        Polygon((-13.17081888, 18.107646379), (-13.224232647, 19.414721746), (-14.379437125, 19.414721746), (-14.379437125, 6.426642811), (-13.17081888, 6.426642811), align=None)
    extrude(amount=BOSS_EXTRUDE6_DEPTH)

    # Sketch12 → Boss-Extrude7 (add)
    with BuildSketch(Plane(origin=(0, 0, 9.566070483), x_dir=(-1, 0, 0), z_dir=(0, 0, -1))):
        with Locations((0.025767353, 18.785782473)):
            Rectangle(SKETCH12_W, SKETCH12_H)
    extrude(amount=BOSS_EXTRUDE7_DEPTH)

    # Sketch13 → Cut-Extrude5 (cut)
    with BuildSketch(Plane(origin=(18.433655639, 0, 11.465910206), x_dir=(-0.5281717070926116, 0, 0.8491375906335065), z_dir=(-0.8491375906335065, 0, -0.5281717070926116))):
        with Locations((-7.241314346, 21.344195005)):
            Rectangle(SKETCH13_W, SKETCH13_H)
    extrude(amount=-CUT_EXTRUDE5_DEPTH, mode=Mode.SUBTRACT)

    # Sketch14 → Boss-Extrude8 (add)
    with BuildSketch(Plane(origin=(0, 0, 7.966070483), x_dir=(-1, 0, 0), z_dir=(0, 0, -1))):
        with Locations((-16.551834886, 12.857646379)):
            Rectangle(SKETCH14_W, SKETCH14_H)
        with Locations((16.595992761, 12.906843201)):
            Rectangle(SKETCH14_W_2, SKETCH14_H_2)
    extrude(amount=-BOSS_EXTRUDE8_DEPTH)

    # Sketch15 → Cut-Extrude6 (cut)
    with BuildSketch(Plane(origin=(-18.433655639, 0, 11.465910206), x_dir=(-0.5281717070926114, 0, -0.8491375906335067), z_dir=(0.8491375906335068, 0, -0.5281717070926114))):
        with Locations((7.242042888, 21.344195005)):
            Rectangle(SKETCH15_W, SKETCH15_H)
    extrude(amount=-CUT_EXTRUDE6_DEPTH, mode=Mode.SUBTRACT)

    # Sketch16 → Cut-Extrude7 (cut)
    with BuildSketch(Plane(origin=(-16.39526965, 0, -9.84278624), x_dir=(0.5147120046125901, 0, -0.8573631391118287), z_dir=(0.8573631391118287, 0, 0.5147120046125901))):
        with Locations((-0.652960459, 21.344195005)):
            Rectangle(SKETCH16_W, SKETCH16_H)
    cut_extrude7 = extrude(amount=-CUT_EXTRUDE7_DEPTH, mode=Mode.SUBTRACT)

    # LPattern2: Cut-Extrude7 ×2
    with Locations(*[Vector(-0.5147120046125903, 0, 0.8573631391118287) * (i * LPATTERN2_PITCH) for i in range(1, LPATTERN2_COUNT)]):
        add(cut_extrude7, mode=Mode.SUBTRACT)

    # LPattern2 col: Cut-Extrude7 ×2
    with Locations(*[Vector(0.5147120046125899, 0, -0.8573631391118288) * (i * LPATTERN2_COL_PITCH) for i in range(1, LPATTERN2_COL_COUNT)]):
        add(cut_extrude7, mode=Mode.SUBTRACT)

    # Mirror2: Cut-Extrude7 across plane
    add(cut_extrude7.mirror(Plane(origin=(0, 0, 0), x_dir=(0, 0, 1), z_dir=(1, 0, 0))), mode=Mode.SUBTRACT)

    # Mirror2 copy 1 sketch → Mirror2 copy 1 (cut)
    with BuildSketch(Plane(origin=(20.512965687, 0, -2.983881127), x_dir=(-0.5147120046125901, 0, -0.8573631391118287), z_dir=(-0.8573631391118287, 0, 0.5147120046125901))):
        with Locations((-0.652960459, -21.344195005)):
            Rectangle(MIRROR2_COPY_1_SKETCH_W, MIRROR2_COPY_1_SKETCH_H)
    extrude(amount=-MIRROR2_COPY_1_DEPTH, mode=Mode.SUBTRACT)

    # Mirror2 copy 2 sketch → Mirror2 copy 2 (cut)
    with BuildSketch(Plane(origin=(12.277573614, 0, -16.701691352), x_dir=(-0.5147120046125901, 0, -0.8573631391118287), z_dir=(-0.8573631391118287, 0, 0.5147120046125901))):
        with Locations((-0.652960459, -21.344195005)):
            Rectangle(MIRROR2_COPY_2_SKETCH_W, MIRROR2_COPY_2_SKETCH_H)
    extrude(amount=-MIRROR2_COPY_2_DEPTH, mode=Mode.SUBTRACT)

    # Sketch17 → Cut-Extrude8 (cut)
    with BuildSketch(Plane.XY.offset(-21.233929517)):
        with Locations((4, 21.344195005)):
            Rectangle(SKETCH17_W, SKETCH17_H)
    cut_extrude8 = extrude(amount=-CUT_EXTRUDE8_DEPTH, mode=Mode.SUBTRACT)

    # LPattern3: Cut-Extrude8 ×2
    with Locations(*[(-i * LPATTERN3_PITCH, 0, 0) for i in range(1, LPATTERN3_COUNT)]):
        add(cut_extrude8, mode=Mode.SUBTRACT)


solid = part.part
